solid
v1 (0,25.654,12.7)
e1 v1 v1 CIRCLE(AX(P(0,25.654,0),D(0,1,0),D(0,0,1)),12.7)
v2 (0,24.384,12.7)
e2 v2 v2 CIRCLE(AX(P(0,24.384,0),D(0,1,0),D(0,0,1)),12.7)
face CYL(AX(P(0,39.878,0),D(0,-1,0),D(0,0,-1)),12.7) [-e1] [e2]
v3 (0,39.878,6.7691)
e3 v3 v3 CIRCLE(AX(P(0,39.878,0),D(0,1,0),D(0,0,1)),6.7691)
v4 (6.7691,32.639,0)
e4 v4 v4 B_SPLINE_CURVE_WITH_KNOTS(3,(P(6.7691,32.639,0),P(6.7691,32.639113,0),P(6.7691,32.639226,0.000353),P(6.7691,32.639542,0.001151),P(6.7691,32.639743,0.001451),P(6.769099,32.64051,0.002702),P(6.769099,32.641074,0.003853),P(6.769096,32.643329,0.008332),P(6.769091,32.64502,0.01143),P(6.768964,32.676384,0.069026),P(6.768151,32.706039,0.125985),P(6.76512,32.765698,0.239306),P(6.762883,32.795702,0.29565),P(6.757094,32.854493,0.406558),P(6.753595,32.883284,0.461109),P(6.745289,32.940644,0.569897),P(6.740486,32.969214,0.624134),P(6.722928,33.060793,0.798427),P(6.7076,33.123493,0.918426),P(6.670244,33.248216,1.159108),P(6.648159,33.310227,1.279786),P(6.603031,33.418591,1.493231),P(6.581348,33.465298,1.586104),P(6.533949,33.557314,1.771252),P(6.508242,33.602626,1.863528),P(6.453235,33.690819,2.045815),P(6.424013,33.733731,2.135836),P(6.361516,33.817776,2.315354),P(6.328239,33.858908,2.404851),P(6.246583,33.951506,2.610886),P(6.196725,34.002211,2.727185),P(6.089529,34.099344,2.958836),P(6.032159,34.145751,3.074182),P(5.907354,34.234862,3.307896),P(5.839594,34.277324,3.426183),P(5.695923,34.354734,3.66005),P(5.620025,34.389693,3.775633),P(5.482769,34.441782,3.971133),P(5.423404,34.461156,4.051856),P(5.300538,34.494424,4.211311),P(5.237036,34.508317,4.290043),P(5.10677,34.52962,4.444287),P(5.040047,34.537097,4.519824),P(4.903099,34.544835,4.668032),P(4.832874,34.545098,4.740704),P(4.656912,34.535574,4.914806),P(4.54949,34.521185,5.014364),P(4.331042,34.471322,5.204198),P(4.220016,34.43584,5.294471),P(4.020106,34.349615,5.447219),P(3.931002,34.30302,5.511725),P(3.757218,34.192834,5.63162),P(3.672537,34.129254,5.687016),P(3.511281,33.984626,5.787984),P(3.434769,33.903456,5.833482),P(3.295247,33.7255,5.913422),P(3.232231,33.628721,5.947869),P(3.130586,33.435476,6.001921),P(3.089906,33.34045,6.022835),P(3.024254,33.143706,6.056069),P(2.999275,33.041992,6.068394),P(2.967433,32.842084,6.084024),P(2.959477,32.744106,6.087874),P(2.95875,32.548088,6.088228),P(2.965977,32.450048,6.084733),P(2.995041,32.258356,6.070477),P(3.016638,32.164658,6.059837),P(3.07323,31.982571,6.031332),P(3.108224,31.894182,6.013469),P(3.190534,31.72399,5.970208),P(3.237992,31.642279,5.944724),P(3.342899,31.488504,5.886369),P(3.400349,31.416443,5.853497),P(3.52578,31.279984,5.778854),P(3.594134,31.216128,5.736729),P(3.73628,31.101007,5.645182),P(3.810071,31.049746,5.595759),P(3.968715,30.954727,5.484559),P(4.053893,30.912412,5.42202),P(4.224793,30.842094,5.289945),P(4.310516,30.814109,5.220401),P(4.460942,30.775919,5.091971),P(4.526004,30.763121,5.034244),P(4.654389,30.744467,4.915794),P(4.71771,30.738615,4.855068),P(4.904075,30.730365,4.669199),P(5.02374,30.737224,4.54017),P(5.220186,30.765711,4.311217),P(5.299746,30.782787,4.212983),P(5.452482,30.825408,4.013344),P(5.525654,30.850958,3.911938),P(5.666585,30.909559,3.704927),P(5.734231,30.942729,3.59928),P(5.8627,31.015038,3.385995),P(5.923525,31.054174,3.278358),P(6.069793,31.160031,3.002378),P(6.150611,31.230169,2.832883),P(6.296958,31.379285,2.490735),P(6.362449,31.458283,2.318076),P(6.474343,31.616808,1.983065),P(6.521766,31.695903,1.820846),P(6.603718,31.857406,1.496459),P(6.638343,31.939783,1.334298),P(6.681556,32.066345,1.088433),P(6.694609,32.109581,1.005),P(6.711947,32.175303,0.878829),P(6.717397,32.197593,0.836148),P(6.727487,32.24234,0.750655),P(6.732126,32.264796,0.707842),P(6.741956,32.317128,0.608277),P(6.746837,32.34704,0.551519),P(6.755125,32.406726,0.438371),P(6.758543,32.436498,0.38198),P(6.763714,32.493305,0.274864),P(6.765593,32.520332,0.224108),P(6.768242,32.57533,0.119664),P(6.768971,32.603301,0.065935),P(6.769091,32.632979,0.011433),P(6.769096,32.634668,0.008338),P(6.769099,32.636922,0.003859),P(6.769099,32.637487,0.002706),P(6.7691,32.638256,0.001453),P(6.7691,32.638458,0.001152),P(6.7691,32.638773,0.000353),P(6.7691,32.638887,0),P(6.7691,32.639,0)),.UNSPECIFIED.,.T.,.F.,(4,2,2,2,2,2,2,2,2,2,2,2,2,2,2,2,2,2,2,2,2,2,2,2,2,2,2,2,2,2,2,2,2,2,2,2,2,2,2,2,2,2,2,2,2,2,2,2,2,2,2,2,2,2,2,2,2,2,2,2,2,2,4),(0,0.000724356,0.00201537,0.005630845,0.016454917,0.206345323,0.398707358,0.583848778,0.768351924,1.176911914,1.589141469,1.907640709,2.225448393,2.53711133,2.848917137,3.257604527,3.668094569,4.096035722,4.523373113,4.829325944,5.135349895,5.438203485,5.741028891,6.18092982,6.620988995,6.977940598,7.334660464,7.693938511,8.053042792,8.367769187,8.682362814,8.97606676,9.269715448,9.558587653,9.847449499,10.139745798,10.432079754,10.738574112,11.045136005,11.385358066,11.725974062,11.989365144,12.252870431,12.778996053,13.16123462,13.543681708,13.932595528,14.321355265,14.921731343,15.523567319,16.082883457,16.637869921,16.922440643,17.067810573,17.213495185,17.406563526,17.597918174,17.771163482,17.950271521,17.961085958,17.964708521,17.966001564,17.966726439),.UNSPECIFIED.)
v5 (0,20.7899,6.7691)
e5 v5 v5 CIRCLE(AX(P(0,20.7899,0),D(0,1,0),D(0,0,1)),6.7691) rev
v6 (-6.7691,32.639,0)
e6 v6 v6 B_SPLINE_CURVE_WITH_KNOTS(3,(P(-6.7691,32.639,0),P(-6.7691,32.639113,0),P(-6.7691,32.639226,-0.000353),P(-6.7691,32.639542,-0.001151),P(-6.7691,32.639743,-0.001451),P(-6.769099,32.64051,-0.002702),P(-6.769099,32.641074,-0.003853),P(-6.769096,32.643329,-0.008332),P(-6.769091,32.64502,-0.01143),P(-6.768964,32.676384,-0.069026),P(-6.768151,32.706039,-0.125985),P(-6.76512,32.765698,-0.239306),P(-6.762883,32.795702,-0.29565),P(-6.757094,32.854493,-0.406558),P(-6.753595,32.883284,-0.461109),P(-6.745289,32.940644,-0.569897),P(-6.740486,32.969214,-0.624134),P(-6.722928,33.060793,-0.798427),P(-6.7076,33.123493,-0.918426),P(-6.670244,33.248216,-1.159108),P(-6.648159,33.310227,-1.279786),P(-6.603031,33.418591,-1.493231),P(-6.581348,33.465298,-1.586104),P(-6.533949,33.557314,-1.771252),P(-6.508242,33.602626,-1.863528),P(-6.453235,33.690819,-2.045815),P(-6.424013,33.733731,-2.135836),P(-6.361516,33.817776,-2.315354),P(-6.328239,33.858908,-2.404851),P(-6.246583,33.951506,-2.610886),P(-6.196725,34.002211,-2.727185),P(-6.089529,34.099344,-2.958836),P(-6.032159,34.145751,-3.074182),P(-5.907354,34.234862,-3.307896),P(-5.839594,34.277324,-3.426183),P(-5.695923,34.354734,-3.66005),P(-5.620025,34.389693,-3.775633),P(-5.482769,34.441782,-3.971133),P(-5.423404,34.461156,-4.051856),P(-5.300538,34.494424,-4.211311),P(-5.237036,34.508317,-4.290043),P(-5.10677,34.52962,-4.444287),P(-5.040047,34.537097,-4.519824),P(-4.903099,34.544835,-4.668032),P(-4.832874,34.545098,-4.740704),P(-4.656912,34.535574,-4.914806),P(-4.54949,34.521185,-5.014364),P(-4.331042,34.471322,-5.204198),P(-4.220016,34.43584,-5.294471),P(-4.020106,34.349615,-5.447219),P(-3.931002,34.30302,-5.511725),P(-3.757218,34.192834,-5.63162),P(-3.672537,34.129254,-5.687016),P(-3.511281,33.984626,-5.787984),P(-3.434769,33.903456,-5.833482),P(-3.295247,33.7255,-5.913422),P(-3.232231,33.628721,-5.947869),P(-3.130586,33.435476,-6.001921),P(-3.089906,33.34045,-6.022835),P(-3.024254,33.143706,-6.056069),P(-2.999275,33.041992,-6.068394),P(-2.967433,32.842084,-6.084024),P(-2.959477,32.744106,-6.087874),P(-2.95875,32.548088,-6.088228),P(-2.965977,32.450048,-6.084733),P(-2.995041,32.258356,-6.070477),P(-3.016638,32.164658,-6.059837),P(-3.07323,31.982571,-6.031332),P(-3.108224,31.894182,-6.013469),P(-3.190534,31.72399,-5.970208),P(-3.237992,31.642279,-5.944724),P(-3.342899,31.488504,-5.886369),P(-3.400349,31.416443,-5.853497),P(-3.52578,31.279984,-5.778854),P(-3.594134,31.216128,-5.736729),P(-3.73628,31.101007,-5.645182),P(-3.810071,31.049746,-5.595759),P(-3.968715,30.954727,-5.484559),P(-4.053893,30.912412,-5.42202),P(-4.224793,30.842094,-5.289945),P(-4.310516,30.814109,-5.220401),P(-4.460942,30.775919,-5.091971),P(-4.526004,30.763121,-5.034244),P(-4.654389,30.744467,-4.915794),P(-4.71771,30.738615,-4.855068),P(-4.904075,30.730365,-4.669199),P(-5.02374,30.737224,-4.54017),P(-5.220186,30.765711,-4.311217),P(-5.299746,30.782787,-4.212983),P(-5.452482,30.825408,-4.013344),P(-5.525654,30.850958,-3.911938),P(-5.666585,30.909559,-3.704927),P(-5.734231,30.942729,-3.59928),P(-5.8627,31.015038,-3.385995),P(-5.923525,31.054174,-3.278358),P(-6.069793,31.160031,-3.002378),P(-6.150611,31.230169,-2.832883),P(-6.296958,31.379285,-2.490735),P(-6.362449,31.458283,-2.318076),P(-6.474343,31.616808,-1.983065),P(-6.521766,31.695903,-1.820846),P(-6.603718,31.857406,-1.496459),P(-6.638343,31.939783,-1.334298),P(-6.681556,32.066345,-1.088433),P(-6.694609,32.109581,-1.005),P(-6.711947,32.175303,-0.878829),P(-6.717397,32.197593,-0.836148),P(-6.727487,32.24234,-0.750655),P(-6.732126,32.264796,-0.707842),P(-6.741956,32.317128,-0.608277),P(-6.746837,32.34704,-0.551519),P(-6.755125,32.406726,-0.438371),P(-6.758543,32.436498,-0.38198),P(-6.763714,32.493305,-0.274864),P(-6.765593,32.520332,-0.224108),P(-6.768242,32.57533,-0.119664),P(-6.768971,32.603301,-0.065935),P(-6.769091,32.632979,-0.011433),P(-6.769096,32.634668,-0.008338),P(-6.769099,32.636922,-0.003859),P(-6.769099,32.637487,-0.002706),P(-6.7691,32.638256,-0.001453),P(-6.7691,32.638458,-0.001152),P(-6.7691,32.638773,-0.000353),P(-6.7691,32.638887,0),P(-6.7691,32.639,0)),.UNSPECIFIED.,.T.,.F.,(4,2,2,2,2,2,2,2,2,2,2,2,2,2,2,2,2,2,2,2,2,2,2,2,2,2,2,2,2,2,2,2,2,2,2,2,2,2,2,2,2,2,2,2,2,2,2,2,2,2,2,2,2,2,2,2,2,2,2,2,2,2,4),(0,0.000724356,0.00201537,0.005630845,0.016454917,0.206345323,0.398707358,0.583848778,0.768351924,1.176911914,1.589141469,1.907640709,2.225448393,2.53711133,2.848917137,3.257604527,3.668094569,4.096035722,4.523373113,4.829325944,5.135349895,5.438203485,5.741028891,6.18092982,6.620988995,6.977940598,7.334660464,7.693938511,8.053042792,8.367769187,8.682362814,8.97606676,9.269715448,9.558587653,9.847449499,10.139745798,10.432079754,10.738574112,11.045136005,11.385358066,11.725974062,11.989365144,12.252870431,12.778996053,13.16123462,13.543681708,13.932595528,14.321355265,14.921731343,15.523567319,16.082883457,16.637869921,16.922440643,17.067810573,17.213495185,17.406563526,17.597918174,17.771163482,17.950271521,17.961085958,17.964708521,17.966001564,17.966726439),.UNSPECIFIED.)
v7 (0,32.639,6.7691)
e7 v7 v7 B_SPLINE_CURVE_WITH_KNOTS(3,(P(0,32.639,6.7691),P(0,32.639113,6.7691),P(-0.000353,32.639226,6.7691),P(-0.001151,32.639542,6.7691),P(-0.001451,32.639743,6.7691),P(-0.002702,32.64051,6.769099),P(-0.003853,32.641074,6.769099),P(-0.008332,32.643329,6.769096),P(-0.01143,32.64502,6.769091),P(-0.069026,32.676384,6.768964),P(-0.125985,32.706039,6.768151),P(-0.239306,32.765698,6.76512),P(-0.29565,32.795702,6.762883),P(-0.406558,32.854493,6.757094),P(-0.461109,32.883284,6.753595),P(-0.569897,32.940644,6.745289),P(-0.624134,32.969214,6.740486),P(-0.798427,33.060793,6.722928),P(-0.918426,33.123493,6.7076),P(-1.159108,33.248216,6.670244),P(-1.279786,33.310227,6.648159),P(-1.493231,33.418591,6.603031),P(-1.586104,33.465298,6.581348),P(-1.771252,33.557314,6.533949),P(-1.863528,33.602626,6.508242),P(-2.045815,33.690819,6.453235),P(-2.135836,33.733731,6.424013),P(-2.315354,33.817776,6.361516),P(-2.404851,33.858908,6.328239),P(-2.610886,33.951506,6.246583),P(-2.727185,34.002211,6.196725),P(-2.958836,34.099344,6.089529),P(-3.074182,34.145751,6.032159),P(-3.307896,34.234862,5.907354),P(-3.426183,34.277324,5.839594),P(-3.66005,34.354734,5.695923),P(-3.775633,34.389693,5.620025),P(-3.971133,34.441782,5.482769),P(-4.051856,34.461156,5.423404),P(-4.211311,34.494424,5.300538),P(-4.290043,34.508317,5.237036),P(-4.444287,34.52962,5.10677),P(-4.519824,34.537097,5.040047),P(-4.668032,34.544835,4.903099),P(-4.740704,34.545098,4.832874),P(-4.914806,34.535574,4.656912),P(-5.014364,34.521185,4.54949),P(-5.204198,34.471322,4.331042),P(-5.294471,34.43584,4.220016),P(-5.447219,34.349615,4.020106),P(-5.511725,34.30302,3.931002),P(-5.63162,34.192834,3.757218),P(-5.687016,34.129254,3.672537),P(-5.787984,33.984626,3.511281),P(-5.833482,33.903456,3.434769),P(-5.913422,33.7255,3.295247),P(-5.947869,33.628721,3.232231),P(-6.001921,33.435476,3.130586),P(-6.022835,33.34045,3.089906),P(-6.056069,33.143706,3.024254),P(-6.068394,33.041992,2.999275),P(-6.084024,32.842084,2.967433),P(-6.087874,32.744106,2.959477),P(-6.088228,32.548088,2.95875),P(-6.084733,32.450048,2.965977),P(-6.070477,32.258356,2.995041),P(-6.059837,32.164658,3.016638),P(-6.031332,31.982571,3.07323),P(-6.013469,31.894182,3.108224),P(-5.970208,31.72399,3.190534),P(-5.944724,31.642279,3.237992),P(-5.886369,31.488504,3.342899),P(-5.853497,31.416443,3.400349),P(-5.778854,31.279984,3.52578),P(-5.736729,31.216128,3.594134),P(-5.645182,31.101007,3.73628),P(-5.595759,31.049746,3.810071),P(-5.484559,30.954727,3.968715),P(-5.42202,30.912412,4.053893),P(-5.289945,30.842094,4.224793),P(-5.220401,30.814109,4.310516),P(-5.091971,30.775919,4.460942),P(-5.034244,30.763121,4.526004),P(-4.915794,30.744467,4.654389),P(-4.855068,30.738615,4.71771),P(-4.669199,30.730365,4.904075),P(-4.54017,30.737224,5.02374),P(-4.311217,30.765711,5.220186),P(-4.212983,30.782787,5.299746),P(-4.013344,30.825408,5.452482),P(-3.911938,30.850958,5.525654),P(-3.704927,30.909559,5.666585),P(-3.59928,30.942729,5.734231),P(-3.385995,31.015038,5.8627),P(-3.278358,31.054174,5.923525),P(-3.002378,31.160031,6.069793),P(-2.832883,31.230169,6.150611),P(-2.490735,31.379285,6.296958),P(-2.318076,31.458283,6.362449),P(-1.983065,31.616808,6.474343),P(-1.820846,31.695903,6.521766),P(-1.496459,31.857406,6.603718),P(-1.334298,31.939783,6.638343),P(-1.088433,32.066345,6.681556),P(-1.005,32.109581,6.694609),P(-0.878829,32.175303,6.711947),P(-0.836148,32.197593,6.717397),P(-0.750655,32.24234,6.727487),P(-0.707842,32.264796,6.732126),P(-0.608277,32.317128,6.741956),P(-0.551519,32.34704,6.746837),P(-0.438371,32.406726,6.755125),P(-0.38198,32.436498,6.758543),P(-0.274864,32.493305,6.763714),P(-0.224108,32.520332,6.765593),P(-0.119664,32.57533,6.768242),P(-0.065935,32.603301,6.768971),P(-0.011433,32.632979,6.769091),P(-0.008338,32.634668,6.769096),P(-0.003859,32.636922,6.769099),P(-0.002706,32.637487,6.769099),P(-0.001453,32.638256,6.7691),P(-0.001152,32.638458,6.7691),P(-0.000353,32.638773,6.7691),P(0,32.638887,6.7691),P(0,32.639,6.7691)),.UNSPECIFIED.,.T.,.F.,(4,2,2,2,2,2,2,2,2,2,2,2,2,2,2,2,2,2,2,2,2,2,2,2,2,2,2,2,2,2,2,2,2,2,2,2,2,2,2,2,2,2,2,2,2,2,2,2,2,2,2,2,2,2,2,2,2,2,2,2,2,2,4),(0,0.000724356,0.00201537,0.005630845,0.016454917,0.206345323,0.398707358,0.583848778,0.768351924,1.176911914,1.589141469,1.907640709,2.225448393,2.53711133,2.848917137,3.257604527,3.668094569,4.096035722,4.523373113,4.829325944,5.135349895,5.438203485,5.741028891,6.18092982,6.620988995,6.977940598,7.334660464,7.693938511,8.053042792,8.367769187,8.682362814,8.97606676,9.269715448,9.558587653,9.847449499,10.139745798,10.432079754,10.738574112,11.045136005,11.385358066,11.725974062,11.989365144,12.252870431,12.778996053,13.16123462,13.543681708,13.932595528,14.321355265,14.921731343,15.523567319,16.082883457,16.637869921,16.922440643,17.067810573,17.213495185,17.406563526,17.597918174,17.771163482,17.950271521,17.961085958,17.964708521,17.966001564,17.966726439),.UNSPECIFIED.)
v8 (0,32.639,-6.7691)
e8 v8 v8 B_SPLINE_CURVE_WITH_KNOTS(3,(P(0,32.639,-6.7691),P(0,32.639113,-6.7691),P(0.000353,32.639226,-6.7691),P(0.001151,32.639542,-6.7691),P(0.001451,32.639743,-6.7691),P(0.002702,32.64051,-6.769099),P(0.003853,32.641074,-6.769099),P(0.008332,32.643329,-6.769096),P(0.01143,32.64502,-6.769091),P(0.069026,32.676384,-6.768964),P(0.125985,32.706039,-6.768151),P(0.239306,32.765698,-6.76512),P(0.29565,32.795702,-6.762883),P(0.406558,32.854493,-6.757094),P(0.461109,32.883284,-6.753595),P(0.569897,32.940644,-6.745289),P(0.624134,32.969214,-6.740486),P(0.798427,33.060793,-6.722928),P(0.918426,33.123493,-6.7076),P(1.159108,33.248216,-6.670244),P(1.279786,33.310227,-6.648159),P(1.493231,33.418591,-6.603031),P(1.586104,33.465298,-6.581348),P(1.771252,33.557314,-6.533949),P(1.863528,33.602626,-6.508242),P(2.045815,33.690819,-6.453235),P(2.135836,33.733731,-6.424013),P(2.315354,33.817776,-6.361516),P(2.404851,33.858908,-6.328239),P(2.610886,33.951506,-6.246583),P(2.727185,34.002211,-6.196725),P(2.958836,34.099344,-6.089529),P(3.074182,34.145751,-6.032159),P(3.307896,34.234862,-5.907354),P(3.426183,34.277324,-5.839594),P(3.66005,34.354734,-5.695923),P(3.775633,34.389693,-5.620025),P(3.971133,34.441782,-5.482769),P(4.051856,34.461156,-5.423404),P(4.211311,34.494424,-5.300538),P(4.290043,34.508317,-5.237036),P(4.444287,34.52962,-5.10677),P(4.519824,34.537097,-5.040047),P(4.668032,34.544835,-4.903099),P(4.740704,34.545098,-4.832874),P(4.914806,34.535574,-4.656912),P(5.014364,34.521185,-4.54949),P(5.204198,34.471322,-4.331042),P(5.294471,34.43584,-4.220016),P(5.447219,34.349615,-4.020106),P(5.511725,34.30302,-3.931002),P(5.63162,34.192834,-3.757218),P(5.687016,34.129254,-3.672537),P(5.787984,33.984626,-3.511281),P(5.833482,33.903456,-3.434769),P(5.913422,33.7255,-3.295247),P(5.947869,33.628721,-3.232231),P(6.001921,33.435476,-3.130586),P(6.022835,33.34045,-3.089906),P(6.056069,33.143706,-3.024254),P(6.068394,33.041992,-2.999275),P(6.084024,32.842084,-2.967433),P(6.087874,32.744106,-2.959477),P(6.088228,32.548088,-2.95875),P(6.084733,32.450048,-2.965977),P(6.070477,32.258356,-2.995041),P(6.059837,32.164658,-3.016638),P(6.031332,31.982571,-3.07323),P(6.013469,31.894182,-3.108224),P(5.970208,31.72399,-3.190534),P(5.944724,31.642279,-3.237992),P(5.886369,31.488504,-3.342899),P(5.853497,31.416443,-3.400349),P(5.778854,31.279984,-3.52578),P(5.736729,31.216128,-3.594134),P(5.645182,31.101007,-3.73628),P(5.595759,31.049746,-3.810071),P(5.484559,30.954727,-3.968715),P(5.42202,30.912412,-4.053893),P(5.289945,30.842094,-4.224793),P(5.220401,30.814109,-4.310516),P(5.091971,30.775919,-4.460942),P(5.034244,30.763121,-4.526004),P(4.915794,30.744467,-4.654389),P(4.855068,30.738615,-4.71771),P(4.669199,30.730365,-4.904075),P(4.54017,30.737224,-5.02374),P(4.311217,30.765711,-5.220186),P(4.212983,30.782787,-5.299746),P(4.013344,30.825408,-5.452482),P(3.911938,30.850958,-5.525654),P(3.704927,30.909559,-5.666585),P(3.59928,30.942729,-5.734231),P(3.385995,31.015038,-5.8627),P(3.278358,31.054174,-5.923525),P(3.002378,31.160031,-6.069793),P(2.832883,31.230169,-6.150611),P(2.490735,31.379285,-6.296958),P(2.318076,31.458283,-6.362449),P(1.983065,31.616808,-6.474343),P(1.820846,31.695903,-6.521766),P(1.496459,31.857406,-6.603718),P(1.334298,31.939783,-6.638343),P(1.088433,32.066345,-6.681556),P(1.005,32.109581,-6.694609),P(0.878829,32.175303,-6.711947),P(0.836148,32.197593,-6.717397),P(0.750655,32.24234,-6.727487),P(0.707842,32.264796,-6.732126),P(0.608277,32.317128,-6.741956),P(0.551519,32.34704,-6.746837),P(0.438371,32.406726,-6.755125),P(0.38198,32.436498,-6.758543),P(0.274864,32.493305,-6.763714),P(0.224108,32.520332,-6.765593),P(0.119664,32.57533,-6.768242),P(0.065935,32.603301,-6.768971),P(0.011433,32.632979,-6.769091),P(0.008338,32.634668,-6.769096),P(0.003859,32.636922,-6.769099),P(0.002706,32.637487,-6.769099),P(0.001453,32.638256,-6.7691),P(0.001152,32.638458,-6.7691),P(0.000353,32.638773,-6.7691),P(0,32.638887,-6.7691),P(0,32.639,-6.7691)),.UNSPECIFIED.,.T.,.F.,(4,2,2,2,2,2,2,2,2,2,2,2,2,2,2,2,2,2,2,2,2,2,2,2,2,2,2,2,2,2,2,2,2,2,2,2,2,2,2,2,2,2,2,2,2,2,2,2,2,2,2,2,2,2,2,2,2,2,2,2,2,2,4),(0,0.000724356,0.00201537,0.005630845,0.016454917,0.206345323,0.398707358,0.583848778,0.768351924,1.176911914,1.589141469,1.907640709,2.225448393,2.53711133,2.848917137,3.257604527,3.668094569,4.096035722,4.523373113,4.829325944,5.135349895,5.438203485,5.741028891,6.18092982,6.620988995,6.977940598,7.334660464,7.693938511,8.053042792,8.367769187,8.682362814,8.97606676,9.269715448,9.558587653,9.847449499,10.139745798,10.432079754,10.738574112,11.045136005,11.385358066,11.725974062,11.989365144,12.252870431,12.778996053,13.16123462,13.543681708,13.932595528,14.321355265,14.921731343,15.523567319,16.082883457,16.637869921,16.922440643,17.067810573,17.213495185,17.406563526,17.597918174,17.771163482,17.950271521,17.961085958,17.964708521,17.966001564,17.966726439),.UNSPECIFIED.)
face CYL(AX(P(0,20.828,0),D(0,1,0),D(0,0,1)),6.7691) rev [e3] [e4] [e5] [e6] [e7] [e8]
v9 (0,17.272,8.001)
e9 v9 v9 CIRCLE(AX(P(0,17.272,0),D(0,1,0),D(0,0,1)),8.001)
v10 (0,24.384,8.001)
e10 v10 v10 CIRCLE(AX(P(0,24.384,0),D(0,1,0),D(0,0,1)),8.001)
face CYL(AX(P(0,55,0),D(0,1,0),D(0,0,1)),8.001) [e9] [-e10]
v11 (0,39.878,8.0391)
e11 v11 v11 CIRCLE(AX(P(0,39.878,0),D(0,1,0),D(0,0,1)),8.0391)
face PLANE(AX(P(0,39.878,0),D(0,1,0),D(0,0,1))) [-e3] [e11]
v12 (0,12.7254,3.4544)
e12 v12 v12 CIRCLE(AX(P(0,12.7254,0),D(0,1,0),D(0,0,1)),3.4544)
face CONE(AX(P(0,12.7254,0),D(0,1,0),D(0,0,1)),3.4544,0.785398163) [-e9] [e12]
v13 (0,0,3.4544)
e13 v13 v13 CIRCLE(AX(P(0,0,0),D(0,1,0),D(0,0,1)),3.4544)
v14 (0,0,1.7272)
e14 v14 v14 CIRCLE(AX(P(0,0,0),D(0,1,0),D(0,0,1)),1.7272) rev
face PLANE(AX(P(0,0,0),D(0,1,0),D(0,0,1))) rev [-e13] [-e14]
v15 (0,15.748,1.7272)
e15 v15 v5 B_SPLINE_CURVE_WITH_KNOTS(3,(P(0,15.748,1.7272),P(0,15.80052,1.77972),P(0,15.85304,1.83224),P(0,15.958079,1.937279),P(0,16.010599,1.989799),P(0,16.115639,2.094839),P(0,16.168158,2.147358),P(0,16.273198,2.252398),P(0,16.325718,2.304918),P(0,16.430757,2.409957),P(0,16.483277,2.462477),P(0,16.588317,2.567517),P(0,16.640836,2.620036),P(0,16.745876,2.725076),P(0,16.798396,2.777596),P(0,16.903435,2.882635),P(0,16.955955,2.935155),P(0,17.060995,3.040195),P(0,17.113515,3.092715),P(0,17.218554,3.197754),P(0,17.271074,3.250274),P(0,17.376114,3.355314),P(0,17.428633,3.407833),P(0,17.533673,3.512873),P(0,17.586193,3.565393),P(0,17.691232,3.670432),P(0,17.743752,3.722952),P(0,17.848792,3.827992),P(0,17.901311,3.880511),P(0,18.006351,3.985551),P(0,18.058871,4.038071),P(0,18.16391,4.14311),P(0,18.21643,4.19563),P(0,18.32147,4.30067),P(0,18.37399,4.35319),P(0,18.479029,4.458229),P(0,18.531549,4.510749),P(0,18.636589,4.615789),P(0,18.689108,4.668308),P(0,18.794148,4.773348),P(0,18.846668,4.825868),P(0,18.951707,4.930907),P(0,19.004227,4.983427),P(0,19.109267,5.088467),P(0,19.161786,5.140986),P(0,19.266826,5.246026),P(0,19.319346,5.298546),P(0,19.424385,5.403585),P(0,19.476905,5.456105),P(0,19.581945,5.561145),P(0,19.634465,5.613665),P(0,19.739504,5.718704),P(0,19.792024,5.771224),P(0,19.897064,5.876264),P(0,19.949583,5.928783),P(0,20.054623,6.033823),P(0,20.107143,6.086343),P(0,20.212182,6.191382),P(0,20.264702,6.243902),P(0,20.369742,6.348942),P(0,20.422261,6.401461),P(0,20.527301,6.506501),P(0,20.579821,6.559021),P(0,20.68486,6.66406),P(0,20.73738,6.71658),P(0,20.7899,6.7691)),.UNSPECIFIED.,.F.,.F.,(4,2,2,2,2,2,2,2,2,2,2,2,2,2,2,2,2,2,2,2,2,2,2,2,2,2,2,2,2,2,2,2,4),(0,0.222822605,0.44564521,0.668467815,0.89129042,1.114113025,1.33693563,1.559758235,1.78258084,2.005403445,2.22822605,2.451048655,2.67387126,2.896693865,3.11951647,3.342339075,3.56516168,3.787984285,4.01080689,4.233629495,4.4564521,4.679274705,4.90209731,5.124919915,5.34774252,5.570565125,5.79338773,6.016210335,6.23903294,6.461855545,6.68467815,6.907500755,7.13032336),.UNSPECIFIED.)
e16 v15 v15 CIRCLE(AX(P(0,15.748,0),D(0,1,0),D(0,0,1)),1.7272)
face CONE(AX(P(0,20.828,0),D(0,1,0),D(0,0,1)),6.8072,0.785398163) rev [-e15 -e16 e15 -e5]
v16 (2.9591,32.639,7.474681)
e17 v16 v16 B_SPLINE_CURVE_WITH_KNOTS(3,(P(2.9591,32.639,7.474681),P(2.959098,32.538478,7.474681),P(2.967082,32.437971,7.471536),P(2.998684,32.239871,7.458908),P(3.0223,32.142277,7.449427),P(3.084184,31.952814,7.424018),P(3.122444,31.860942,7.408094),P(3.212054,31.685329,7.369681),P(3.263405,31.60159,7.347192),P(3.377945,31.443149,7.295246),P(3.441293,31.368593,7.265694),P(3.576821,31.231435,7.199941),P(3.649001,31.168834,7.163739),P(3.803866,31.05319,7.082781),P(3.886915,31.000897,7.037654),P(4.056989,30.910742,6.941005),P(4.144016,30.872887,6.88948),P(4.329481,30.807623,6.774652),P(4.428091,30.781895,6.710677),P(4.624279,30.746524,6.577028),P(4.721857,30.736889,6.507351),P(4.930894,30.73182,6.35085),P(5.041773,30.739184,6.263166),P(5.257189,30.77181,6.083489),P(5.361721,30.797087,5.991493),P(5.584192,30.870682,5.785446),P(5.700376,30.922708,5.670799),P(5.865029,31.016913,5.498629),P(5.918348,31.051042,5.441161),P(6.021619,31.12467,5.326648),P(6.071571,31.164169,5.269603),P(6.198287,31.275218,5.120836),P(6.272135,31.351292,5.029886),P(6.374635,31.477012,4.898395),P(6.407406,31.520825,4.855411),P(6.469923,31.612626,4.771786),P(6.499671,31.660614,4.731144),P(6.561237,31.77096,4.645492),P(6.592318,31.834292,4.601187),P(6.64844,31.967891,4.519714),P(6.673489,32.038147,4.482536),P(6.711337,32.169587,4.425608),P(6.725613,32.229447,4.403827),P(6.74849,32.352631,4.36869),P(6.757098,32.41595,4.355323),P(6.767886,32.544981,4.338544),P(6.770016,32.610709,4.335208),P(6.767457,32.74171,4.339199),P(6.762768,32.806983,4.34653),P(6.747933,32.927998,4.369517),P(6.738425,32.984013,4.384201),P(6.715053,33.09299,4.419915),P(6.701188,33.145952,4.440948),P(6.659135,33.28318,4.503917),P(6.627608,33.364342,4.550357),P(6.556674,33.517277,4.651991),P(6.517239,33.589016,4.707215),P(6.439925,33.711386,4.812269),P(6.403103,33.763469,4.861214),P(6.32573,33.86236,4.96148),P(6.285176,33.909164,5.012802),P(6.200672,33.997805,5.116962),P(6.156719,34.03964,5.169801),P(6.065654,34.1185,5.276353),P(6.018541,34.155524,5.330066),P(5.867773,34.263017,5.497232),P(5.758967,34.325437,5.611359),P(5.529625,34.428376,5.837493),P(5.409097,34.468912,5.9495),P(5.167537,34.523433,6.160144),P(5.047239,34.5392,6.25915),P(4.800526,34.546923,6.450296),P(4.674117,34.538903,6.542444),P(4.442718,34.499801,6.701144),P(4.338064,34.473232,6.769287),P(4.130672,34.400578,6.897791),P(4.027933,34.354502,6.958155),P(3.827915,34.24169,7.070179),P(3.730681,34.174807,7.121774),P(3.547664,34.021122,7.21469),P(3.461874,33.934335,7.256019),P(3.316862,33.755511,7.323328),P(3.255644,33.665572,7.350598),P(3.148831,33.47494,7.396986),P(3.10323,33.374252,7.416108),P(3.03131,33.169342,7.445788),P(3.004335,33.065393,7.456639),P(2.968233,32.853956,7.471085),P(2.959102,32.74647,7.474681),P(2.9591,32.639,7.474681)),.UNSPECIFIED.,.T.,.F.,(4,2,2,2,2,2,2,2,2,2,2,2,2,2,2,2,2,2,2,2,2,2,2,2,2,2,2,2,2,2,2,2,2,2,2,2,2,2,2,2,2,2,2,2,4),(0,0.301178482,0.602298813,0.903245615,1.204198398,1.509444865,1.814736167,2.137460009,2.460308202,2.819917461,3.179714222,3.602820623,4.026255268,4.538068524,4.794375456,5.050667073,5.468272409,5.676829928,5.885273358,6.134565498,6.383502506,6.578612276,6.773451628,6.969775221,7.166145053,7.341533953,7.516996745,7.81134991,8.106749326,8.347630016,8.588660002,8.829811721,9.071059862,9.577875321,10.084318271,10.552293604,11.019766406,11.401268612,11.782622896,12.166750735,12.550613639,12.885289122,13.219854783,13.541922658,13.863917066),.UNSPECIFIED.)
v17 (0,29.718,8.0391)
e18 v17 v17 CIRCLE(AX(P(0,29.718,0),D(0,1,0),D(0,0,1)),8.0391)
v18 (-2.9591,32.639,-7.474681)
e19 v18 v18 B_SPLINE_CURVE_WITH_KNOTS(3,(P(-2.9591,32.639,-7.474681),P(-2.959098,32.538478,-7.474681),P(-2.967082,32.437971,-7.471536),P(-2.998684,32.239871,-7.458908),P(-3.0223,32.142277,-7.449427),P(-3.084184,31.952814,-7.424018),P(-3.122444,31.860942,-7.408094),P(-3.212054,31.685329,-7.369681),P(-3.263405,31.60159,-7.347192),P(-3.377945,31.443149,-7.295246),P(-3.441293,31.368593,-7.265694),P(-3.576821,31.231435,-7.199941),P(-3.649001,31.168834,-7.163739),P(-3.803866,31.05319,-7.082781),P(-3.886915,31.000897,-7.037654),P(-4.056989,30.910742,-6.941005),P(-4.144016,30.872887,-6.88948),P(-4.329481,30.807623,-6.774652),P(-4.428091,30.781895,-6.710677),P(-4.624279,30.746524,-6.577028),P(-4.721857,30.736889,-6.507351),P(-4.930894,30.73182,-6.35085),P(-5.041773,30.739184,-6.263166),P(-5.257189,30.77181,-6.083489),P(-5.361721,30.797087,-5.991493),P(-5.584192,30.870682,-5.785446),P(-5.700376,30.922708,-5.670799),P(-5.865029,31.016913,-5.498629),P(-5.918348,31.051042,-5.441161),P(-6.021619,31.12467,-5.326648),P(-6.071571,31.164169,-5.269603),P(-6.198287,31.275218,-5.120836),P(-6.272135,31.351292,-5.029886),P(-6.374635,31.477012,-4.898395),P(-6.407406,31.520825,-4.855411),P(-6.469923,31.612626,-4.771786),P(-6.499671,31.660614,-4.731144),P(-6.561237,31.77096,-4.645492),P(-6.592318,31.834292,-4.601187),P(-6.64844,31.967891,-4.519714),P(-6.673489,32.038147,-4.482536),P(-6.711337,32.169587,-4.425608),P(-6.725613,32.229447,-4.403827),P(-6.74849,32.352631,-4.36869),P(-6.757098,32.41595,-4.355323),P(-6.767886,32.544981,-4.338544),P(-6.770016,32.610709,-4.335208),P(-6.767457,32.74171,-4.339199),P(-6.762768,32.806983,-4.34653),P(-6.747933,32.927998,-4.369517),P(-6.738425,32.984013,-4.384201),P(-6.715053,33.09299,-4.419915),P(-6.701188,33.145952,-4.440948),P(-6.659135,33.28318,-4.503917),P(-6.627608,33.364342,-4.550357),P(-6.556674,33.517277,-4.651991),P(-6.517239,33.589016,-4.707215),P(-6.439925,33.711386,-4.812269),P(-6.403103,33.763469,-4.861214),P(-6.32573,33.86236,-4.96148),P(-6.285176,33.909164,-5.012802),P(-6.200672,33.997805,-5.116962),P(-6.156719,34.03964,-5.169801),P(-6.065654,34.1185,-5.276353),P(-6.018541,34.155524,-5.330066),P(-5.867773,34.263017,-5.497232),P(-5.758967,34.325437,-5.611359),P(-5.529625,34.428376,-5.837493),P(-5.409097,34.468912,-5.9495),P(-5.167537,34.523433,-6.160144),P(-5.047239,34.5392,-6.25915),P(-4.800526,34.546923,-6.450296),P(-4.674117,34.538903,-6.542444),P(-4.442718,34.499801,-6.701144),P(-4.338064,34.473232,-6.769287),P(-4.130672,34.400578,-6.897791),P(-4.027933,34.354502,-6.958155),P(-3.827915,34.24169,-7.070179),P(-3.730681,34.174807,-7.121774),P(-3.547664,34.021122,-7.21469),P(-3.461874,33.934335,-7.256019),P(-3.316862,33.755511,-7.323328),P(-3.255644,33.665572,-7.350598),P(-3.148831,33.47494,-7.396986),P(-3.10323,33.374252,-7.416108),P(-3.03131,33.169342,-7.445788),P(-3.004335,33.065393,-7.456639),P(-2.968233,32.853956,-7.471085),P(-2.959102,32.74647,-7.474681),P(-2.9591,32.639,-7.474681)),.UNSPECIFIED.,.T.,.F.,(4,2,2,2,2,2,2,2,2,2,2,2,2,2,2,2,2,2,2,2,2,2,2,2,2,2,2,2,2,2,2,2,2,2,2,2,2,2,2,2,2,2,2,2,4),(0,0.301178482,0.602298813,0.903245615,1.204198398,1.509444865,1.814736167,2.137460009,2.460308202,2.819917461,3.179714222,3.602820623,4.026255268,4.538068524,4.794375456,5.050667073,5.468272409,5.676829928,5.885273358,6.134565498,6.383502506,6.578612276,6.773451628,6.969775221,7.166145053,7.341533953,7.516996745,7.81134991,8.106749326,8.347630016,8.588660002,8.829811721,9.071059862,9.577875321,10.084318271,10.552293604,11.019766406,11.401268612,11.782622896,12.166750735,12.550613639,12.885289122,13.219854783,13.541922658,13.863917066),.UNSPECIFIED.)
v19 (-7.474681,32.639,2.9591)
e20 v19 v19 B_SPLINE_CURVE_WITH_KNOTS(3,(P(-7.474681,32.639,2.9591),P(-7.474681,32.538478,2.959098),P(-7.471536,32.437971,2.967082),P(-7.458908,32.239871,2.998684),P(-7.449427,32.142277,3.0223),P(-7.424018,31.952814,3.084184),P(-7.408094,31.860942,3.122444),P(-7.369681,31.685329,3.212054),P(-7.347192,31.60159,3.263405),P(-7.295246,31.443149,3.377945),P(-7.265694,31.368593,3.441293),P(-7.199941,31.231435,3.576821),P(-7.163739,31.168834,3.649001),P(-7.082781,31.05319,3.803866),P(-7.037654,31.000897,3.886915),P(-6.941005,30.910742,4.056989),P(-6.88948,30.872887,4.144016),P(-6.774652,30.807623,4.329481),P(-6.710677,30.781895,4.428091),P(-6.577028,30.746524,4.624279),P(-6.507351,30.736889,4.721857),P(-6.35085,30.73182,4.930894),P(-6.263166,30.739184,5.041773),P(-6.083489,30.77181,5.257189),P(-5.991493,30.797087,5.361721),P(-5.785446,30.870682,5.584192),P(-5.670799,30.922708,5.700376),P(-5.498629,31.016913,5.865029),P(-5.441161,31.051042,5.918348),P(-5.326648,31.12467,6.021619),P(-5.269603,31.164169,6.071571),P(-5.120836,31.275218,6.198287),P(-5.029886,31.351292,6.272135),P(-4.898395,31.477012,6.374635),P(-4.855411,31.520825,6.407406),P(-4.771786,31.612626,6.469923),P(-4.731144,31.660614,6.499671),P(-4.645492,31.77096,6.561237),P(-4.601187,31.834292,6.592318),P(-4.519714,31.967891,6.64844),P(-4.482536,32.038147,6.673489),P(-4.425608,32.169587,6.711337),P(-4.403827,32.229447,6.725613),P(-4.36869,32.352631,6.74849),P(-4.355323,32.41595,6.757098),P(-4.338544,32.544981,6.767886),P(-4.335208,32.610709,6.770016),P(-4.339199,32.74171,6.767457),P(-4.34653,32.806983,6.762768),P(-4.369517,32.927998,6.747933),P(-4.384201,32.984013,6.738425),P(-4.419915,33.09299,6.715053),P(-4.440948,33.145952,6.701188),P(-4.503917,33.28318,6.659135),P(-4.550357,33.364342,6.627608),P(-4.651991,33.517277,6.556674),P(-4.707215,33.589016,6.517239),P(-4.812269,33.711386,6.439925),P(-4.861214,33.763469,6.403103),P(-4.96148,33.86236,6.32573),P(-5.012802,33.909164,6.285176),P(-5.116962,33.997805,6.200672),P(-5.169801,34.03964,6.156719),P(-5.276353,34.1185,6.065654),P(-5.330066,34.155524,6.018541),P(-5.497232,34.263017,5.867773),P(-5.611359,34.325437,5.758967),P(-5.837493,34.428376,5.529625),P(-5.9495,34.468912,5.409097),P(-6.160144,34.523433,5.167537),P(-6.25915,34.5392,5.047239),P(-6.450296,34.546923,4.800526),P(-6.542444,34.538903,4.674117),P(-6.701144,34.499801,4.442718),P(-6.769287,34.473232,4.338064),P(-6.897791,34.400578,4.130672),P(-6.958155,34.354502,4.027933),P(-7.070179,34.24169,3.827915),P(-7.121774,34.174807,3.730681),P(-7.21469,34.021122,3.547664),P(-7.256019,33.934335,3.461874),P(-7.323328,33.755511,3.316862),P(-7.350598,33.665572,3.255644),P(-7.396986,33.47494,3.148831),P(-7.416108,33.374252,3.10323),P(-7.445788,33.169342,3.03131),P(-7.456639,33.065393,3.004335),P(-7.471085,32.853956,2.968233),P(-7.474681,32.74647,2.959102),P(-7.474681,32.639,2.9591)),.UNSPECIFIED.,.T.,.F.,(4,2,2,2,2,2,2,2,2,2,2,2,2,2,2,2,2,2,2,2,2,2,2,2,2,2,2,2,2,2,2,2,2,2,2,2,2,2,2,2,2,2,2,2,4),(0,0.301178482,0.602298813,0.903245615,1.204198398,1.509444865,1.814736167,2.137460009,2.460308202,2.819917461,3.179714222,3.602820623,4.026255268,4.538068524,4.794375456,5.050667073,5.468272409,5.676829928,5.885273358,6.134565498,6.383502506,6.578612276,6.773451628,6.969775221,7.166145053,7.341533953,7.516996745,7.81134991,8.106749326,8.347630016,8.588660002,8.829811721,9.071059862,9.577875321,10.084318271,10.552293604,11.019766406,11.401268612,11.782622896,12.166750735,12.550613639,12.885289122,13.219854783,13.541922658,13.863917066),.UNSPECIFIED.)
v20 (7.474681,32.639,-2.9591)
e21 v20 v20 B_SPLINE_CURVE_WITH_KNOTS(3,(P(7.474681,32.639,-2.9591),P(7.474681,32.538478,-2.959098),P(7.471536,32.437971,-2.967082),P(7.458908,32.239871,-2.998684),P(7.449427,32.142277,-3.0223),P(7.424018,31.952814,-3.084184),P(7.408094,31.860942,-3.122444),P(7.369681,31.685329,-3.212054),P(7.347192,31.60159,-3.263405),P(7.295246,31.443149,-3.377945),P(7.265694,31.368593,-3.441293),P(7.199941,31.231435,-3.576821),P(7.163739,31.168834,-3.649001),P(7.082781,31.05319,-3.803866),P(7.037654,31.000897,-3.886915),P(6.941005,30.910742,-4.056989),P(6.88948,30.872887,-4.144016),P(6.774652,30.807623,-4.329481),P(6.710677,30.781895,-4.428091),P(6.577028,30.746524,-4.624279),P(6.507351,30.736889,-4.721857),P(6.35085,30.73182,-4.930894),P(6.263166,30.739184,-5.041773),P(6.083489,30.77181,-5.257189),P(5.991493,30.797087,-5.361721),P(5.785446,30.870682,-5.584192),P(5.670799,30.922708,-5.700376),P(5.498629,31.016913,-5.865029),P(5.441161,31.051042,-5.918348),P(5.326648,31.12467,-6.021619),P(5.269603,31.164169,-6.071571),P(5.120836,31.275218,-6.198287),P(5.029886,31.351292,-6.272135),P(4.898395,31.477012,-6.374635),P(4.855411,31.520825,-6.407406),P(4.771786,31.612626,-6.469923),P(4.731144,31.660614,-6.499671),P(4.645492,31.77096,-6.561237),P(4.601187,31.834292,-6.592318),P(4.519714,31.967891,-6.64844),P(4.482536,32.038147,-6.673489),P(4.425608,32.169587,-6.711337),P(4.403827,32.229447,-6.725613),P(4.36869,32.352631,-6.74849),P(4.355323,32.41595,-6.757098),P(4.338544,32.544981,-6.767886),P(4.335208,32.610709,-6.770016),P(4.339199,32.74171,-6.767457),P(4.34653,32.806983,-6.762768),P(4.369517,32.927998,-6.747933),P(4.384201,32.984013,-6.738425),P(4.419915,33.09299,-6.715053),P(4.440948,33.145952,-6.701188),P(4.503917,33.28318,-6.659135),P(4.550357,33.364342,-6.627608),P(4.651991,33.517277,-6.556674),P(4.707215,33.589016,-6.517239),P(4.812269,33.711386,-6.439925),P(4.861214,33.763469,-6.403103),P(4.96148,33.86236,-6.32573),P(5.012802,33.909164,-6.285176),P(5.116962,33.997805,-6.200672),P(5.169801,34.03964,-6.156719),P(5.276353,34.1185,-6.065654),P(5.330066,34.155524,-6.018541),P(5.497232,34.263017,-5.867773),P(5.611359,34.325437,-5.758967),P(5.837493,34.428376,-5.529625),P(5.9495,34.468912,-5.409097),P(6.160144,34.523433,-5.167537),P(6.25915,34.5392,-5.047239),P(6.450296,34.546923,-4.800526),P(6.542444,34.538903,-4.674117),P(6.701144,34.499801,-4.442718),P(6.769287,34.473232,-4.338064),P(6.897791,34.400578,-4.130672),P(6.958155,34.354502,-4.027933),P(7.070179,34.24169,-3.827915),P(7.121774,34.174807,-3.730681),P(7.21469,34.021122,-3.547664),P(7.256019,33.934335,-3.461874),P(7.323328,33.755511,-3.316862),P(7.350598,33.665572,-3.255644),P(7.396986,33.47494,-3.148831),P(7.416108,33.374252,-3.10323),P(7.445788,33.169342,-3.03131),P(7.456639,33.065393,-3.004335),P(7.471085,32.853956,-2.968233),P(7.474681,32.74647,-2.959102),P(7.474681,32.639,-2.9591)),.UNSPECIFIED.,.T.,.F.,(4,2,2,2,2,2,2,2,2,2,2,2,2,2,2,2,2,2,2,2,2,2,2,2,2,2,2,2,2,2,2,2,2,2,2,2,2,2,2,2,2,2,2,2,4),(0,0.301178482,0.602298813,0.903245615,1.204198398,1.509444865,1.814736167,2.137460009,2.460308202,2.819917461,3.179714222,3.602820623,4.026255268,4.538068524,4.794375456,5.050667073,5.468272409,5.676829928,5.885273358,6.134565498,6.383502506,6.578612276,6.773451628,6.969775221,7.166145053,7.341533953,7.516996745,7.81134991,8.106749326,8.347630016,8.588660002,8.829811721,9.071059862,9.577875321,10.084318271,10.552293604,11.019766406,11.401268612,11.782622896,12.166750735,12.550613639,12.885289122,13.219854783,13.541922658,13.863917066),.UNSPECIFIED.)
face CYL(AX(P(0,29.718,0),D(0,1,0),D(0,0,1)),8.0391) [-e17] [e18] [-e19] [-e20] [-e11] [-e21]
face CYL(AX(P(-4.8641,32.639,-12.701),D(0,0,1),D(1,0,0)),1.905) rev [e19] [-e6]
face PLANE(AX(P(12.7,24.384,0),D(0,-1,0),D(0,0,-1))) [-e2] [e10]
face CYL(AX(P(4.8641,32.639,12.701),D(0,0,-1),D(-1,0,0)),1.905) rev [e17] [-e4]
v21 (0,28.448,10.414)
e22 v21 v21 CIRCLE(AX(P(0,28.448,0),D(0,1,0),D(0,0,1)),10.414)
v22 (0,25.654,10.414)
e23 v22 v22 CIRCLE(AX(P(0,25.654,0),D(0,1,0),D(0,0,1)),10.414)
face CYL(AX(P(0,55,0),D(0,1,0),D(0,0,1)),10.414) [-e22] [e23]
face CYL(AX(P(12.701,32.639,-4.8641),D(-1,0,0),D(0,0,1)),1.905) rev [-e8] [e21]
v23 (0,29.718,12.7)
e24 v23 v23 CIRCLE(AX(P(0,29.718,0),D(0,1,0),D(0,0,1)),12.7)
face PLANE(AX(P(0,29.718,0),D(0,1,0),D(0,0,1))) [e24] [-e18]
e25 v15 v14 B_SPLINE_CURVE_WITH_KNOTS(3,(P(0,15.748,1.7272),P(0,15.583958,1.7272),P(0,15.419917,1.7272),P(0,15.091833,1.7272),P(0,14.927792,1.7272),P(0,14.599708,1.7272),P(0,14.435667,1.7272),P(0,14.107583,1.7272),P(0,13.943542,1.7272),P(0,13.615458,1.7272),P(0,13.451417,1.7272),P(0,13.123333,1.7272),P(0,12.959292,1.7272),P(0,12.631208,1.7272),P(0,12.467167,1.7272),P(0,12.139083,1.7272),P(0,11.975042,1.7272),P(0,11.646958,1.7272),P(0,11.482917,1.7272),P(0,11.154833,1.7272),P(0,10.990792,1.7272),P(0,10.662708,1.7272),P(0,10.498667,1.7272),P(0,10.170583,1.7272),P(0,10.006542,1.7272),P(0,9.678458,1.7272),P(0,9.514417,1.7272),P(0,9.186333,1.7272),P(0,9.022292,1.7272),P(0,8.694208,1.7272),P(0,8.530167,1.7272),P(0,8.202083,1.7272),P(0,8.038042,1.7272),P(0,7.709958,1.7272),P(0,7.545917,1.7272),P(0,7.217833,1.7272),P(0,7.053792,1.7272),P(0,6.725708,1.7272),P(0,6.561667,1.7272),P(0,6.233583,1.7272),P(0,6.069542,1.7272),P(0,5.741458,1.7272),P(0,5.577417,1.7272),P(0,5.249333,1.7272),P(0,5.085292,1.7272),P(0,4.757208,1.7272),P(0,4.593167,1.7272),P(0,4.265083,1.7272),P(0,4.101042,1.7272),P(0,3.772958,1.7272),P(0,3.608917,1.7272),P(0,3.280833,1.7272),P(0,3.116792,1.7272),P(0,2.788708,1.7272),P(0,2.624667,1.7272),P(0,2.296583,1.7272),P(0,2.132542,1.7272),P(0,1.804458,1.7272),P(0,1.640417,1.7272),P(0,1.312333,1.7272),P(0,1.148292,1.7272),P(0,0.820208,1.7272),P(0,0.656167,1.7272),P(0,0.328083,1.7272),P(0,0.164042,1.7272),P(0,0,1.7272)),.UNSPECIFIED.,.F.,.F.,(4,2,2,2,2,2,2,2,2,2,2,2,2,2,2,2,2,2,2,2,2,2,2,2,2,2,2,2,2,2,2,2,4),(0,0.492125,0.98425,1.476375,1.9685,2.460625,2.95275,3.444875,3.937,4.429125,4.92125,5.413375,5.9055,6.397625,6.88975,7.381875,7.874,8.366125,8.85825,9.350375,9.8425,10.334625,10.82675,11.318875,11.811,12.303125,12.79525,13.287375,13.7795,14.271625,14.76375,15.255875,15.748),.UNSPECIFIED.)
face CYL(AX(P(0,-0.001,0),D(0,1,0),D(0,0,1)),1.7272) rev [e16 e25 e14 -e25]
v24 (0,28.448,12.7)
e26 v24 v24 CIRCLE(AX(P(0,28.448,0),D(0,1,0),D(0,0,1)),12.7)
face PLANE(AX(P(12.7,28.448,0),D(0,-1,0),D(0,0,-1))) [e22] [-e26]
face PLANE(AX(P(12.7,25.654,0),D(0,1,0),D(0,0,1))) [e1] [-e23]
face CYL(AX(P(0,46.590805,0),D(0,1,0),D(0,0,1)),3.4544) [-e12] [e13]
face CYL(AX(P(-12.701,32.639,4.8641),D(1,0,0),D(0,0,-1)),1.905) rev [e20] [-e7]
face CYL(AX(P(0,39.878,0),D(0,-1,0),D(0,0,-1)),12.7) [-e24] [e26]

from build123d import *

# Parameters (mm, degrees)
SKETCH2_R                = 12.7
SOLID_CYLINDER_DEPTH     = 39.878
ALL_THROUGH_HOLE_REACH   = 45.736
SKETCH3_R                = 1.7272
SKETCH4_R                = 6.7691
SWIRL_CHAMBER_DEPTH      = 19.05
TOP_START                = -10.16
SKETCH5_R                = 12.7
SKETCH5_R_2              = 8.0391
TOP_OUTER_CUT_DEPTH      = 10.16
SKETCH8_W                = 2.286
SKETCH8_H                = 2.794
SKETCH9_W                = 4.699
SKETCH9_H                = 24.384
INNER_CHAMFER_SIZE       = 5.08
INLET_HOLE_REACH         = 45.736
INLET_HOLE_END_RADIUS    = 8.0391
SKETCH12_R               = 1.905
INLET_HOLE_PATTERN_COUNT = 4


with BuildPart() as part:
    # Sketch2 → Solid Cylinder (new body)
    with BuildSketch(Plane(origin=(0, 0, 0), x_dir=(1, 0, 0), z_dir=(0, 1, 0))):
        with Locations(Location((0, 0, 0), (0, 0, 270))):
            Circle(SKETCH2_R)
    extrude(amount=SOLID_CYLINDER_DEPTH)

    # Sketch3 → All Through Hole (cut, up to next)
    with BuildSketch(Plane(origin=(0, 39.878, 0), x_dir=(1, 0, 0), z_dir=(0, 1, 0)), mode=Mode.PRIVATE) as all_through_hole_sk1:
        with Locations(Location((0, 0, 0), (0, 0, 270))):
            Circle(SKETCH3_R)
    all_through_hole_tool1 = extrude(all_through_hole_sk1.sketch, amount=-ALL_THROUGH_HOLE_REACH, mode=Mode.PRIVATE) & part.part
    add(all_through_hole_tool1.solids().sort_by_distance((0, 39.878, 0))[0], mode=Mode.SUBTRACT)

    # Sketch4 → Swirl Chamber (cut)
    with BuildSketch(Plane(origin=(0, 39.878, 0), x_dir=(1, 0, 0), z_dir=(0, 1, 0))):
        with Locations(Location((0, 0, 0), (0, 0, 270))):
            Circle(SKETCH4_R)
    extrude(amount=-SWIRL_CHAMBER_DEPTH, mode=Mode.SUBTRACT)

    # Sketch5 → Top Outer cut (cut)
    with BuildSketch(Plane(origin=(0, 39.878, 0), x_dir=(1, 0, 0), z_dir=(0, 1, 0)).offset(TOP_START)):
        with Locations(Location((0, 0, 0), (0, 0, 270))):
            Circle(SKETCH5_R)
        with Locations(Location((0, 0, 0), (0, 0, 270))):
            Circle(SKETCH5_R_2, mode=Mode.SUBTRACT)
    extrude(amount=TOP_OUTER_CUT_DEPTH, mode=Mode.SUBTRACT)

    # Sketch8 → O Ring Cut (revolve, cut)
    with BuildSketch(Plane.XY, mode=Mode.PRIVATE) as o_ring_cut_sk:
        with Locations((11.557, 27.051)):
            Rectangle(SKETCH8_W, SKETCH8_H)
    revolve(o_ring_cut_sk.sketch.rotate(Axis((0, 55, 0), (0, -1, 0)), 90), axis=Axis((0, 55, 0), (0, -1, 0)), mode=Mode.SUBTRACT)

    # Sketch9 → Base Support (revolve, cut)
    with BuildSketch(Plane.XY, mode=Mode.PRIVATE) as base_support_sk:
        with Locations((10.3505, 12.192)):
            Rectangle(SKETCH9_W, SKETCH9_H)
    revolve(base_support_sk.sketch.rotate(Axis((0, 55, 0), (0, -1, 0)), 90), axis=Axis((0, 55, 0), (0, -1, 0)), mode=Mode.SUBTRACT)

    # Inner Chamfer
    # the kernel refuses this chamfer: 5.08 mm, written as the material it takes off along each edge
    with BuildSketch(Plane(origin=(0, 20.828, 0), x_dir=(0, 0, 1), z_dir=(-1, 0, 0))) as inner_chamfer_piece_1_section:
        Polygon((1.7272, -INNER_CHAMFER_SIZE), (1.7272 + INNER_CHAMFER_SIZE, 0), (1.7272, 0), align=None)
    inner_chamfer_piece_1 = revolve(axis=Axis((0, 20.828, 0), (0, 1, 0)), mode=Mode.PRIVATE)
    inner_chamfer_piece_1 = inner_chamfer_piece_1 & Plane(origin=(0, 18.244555095, 0), x_dir=(0, 0, 1), z_dir=(0, 1, 0)) * Cylinder(6.7691, 28, mode=Mode.PRIVATE)
    add(inner_chamfer_piece_1, mode=Mode.SUBTRACT)

    # Inlet Hole: up to this cylinder (the profile starts inside it)
    inlet_hole_end = Plane(origin=(0, 32.639, 0), z_dir=(0, 1, 0)) * Cylinder(INLET_HOLE_END_RADIUS, 108.5502, mode=Mode.PRIVATE)
    # Sketch12 → Inlet Hole (cut, up to the surface)
    with BuildSketch(Plane.XY, mode=Mode.PRIVATE) as inlet_hole_sk1:
        with Locations(Location((4.8641, 32.639, 0), (0, 0, 180))):
            Circle(SKETCH12_R)
    inlet_hole_tool1 = extrude(inlet_hole_sk1.sketch, amount=INLET_HOLE_REACH, mode=Mode.PRIVATE) & inlet_hole_end
    inlet_hole = inlet_hole_tool1.solids().sort_by_distance((4.8641, 32.639, 0))[0]
    add(inlet_hole, mode=Mode.SUBTRACT)

    # Inlet Hole Pattern: Inlet Hole ×4 about axis
    inlet_hole_pattern_axis = Axis((0, 55, 0), (0, -1, 0))
    for i in range(1, INLET_HOLE_PATTERN_COUNT):
        add(inlet_hole.rotate(inlet_hole_pattern_axis, i * 360 / INLET_HOLE_PATTERN_COUNT), mode=Mode.SUBTRACT)

    # Sketch13 → Outer Chamfer and Stem (revolve, cut)
    with BuildSketch(Plane.XY, mode=Mode.PRIVATE) as outer_chamfer_and_stem_sk:
        Polygon((-8.001, 17.272), (-3.4544, 12.7254), (-3.4544, 0), (-8.001, 0), align=None)
    revolve(outer_chamfer_and_stem_sk.sketch.rotate(Axis((0, 46.59080533, 0), (0, -1, 0)), 270), axis=Axis((0, 46.59080533, 0), (0, -1, 0)), mode=Mode.SUBTRACT)


solid = part.part
